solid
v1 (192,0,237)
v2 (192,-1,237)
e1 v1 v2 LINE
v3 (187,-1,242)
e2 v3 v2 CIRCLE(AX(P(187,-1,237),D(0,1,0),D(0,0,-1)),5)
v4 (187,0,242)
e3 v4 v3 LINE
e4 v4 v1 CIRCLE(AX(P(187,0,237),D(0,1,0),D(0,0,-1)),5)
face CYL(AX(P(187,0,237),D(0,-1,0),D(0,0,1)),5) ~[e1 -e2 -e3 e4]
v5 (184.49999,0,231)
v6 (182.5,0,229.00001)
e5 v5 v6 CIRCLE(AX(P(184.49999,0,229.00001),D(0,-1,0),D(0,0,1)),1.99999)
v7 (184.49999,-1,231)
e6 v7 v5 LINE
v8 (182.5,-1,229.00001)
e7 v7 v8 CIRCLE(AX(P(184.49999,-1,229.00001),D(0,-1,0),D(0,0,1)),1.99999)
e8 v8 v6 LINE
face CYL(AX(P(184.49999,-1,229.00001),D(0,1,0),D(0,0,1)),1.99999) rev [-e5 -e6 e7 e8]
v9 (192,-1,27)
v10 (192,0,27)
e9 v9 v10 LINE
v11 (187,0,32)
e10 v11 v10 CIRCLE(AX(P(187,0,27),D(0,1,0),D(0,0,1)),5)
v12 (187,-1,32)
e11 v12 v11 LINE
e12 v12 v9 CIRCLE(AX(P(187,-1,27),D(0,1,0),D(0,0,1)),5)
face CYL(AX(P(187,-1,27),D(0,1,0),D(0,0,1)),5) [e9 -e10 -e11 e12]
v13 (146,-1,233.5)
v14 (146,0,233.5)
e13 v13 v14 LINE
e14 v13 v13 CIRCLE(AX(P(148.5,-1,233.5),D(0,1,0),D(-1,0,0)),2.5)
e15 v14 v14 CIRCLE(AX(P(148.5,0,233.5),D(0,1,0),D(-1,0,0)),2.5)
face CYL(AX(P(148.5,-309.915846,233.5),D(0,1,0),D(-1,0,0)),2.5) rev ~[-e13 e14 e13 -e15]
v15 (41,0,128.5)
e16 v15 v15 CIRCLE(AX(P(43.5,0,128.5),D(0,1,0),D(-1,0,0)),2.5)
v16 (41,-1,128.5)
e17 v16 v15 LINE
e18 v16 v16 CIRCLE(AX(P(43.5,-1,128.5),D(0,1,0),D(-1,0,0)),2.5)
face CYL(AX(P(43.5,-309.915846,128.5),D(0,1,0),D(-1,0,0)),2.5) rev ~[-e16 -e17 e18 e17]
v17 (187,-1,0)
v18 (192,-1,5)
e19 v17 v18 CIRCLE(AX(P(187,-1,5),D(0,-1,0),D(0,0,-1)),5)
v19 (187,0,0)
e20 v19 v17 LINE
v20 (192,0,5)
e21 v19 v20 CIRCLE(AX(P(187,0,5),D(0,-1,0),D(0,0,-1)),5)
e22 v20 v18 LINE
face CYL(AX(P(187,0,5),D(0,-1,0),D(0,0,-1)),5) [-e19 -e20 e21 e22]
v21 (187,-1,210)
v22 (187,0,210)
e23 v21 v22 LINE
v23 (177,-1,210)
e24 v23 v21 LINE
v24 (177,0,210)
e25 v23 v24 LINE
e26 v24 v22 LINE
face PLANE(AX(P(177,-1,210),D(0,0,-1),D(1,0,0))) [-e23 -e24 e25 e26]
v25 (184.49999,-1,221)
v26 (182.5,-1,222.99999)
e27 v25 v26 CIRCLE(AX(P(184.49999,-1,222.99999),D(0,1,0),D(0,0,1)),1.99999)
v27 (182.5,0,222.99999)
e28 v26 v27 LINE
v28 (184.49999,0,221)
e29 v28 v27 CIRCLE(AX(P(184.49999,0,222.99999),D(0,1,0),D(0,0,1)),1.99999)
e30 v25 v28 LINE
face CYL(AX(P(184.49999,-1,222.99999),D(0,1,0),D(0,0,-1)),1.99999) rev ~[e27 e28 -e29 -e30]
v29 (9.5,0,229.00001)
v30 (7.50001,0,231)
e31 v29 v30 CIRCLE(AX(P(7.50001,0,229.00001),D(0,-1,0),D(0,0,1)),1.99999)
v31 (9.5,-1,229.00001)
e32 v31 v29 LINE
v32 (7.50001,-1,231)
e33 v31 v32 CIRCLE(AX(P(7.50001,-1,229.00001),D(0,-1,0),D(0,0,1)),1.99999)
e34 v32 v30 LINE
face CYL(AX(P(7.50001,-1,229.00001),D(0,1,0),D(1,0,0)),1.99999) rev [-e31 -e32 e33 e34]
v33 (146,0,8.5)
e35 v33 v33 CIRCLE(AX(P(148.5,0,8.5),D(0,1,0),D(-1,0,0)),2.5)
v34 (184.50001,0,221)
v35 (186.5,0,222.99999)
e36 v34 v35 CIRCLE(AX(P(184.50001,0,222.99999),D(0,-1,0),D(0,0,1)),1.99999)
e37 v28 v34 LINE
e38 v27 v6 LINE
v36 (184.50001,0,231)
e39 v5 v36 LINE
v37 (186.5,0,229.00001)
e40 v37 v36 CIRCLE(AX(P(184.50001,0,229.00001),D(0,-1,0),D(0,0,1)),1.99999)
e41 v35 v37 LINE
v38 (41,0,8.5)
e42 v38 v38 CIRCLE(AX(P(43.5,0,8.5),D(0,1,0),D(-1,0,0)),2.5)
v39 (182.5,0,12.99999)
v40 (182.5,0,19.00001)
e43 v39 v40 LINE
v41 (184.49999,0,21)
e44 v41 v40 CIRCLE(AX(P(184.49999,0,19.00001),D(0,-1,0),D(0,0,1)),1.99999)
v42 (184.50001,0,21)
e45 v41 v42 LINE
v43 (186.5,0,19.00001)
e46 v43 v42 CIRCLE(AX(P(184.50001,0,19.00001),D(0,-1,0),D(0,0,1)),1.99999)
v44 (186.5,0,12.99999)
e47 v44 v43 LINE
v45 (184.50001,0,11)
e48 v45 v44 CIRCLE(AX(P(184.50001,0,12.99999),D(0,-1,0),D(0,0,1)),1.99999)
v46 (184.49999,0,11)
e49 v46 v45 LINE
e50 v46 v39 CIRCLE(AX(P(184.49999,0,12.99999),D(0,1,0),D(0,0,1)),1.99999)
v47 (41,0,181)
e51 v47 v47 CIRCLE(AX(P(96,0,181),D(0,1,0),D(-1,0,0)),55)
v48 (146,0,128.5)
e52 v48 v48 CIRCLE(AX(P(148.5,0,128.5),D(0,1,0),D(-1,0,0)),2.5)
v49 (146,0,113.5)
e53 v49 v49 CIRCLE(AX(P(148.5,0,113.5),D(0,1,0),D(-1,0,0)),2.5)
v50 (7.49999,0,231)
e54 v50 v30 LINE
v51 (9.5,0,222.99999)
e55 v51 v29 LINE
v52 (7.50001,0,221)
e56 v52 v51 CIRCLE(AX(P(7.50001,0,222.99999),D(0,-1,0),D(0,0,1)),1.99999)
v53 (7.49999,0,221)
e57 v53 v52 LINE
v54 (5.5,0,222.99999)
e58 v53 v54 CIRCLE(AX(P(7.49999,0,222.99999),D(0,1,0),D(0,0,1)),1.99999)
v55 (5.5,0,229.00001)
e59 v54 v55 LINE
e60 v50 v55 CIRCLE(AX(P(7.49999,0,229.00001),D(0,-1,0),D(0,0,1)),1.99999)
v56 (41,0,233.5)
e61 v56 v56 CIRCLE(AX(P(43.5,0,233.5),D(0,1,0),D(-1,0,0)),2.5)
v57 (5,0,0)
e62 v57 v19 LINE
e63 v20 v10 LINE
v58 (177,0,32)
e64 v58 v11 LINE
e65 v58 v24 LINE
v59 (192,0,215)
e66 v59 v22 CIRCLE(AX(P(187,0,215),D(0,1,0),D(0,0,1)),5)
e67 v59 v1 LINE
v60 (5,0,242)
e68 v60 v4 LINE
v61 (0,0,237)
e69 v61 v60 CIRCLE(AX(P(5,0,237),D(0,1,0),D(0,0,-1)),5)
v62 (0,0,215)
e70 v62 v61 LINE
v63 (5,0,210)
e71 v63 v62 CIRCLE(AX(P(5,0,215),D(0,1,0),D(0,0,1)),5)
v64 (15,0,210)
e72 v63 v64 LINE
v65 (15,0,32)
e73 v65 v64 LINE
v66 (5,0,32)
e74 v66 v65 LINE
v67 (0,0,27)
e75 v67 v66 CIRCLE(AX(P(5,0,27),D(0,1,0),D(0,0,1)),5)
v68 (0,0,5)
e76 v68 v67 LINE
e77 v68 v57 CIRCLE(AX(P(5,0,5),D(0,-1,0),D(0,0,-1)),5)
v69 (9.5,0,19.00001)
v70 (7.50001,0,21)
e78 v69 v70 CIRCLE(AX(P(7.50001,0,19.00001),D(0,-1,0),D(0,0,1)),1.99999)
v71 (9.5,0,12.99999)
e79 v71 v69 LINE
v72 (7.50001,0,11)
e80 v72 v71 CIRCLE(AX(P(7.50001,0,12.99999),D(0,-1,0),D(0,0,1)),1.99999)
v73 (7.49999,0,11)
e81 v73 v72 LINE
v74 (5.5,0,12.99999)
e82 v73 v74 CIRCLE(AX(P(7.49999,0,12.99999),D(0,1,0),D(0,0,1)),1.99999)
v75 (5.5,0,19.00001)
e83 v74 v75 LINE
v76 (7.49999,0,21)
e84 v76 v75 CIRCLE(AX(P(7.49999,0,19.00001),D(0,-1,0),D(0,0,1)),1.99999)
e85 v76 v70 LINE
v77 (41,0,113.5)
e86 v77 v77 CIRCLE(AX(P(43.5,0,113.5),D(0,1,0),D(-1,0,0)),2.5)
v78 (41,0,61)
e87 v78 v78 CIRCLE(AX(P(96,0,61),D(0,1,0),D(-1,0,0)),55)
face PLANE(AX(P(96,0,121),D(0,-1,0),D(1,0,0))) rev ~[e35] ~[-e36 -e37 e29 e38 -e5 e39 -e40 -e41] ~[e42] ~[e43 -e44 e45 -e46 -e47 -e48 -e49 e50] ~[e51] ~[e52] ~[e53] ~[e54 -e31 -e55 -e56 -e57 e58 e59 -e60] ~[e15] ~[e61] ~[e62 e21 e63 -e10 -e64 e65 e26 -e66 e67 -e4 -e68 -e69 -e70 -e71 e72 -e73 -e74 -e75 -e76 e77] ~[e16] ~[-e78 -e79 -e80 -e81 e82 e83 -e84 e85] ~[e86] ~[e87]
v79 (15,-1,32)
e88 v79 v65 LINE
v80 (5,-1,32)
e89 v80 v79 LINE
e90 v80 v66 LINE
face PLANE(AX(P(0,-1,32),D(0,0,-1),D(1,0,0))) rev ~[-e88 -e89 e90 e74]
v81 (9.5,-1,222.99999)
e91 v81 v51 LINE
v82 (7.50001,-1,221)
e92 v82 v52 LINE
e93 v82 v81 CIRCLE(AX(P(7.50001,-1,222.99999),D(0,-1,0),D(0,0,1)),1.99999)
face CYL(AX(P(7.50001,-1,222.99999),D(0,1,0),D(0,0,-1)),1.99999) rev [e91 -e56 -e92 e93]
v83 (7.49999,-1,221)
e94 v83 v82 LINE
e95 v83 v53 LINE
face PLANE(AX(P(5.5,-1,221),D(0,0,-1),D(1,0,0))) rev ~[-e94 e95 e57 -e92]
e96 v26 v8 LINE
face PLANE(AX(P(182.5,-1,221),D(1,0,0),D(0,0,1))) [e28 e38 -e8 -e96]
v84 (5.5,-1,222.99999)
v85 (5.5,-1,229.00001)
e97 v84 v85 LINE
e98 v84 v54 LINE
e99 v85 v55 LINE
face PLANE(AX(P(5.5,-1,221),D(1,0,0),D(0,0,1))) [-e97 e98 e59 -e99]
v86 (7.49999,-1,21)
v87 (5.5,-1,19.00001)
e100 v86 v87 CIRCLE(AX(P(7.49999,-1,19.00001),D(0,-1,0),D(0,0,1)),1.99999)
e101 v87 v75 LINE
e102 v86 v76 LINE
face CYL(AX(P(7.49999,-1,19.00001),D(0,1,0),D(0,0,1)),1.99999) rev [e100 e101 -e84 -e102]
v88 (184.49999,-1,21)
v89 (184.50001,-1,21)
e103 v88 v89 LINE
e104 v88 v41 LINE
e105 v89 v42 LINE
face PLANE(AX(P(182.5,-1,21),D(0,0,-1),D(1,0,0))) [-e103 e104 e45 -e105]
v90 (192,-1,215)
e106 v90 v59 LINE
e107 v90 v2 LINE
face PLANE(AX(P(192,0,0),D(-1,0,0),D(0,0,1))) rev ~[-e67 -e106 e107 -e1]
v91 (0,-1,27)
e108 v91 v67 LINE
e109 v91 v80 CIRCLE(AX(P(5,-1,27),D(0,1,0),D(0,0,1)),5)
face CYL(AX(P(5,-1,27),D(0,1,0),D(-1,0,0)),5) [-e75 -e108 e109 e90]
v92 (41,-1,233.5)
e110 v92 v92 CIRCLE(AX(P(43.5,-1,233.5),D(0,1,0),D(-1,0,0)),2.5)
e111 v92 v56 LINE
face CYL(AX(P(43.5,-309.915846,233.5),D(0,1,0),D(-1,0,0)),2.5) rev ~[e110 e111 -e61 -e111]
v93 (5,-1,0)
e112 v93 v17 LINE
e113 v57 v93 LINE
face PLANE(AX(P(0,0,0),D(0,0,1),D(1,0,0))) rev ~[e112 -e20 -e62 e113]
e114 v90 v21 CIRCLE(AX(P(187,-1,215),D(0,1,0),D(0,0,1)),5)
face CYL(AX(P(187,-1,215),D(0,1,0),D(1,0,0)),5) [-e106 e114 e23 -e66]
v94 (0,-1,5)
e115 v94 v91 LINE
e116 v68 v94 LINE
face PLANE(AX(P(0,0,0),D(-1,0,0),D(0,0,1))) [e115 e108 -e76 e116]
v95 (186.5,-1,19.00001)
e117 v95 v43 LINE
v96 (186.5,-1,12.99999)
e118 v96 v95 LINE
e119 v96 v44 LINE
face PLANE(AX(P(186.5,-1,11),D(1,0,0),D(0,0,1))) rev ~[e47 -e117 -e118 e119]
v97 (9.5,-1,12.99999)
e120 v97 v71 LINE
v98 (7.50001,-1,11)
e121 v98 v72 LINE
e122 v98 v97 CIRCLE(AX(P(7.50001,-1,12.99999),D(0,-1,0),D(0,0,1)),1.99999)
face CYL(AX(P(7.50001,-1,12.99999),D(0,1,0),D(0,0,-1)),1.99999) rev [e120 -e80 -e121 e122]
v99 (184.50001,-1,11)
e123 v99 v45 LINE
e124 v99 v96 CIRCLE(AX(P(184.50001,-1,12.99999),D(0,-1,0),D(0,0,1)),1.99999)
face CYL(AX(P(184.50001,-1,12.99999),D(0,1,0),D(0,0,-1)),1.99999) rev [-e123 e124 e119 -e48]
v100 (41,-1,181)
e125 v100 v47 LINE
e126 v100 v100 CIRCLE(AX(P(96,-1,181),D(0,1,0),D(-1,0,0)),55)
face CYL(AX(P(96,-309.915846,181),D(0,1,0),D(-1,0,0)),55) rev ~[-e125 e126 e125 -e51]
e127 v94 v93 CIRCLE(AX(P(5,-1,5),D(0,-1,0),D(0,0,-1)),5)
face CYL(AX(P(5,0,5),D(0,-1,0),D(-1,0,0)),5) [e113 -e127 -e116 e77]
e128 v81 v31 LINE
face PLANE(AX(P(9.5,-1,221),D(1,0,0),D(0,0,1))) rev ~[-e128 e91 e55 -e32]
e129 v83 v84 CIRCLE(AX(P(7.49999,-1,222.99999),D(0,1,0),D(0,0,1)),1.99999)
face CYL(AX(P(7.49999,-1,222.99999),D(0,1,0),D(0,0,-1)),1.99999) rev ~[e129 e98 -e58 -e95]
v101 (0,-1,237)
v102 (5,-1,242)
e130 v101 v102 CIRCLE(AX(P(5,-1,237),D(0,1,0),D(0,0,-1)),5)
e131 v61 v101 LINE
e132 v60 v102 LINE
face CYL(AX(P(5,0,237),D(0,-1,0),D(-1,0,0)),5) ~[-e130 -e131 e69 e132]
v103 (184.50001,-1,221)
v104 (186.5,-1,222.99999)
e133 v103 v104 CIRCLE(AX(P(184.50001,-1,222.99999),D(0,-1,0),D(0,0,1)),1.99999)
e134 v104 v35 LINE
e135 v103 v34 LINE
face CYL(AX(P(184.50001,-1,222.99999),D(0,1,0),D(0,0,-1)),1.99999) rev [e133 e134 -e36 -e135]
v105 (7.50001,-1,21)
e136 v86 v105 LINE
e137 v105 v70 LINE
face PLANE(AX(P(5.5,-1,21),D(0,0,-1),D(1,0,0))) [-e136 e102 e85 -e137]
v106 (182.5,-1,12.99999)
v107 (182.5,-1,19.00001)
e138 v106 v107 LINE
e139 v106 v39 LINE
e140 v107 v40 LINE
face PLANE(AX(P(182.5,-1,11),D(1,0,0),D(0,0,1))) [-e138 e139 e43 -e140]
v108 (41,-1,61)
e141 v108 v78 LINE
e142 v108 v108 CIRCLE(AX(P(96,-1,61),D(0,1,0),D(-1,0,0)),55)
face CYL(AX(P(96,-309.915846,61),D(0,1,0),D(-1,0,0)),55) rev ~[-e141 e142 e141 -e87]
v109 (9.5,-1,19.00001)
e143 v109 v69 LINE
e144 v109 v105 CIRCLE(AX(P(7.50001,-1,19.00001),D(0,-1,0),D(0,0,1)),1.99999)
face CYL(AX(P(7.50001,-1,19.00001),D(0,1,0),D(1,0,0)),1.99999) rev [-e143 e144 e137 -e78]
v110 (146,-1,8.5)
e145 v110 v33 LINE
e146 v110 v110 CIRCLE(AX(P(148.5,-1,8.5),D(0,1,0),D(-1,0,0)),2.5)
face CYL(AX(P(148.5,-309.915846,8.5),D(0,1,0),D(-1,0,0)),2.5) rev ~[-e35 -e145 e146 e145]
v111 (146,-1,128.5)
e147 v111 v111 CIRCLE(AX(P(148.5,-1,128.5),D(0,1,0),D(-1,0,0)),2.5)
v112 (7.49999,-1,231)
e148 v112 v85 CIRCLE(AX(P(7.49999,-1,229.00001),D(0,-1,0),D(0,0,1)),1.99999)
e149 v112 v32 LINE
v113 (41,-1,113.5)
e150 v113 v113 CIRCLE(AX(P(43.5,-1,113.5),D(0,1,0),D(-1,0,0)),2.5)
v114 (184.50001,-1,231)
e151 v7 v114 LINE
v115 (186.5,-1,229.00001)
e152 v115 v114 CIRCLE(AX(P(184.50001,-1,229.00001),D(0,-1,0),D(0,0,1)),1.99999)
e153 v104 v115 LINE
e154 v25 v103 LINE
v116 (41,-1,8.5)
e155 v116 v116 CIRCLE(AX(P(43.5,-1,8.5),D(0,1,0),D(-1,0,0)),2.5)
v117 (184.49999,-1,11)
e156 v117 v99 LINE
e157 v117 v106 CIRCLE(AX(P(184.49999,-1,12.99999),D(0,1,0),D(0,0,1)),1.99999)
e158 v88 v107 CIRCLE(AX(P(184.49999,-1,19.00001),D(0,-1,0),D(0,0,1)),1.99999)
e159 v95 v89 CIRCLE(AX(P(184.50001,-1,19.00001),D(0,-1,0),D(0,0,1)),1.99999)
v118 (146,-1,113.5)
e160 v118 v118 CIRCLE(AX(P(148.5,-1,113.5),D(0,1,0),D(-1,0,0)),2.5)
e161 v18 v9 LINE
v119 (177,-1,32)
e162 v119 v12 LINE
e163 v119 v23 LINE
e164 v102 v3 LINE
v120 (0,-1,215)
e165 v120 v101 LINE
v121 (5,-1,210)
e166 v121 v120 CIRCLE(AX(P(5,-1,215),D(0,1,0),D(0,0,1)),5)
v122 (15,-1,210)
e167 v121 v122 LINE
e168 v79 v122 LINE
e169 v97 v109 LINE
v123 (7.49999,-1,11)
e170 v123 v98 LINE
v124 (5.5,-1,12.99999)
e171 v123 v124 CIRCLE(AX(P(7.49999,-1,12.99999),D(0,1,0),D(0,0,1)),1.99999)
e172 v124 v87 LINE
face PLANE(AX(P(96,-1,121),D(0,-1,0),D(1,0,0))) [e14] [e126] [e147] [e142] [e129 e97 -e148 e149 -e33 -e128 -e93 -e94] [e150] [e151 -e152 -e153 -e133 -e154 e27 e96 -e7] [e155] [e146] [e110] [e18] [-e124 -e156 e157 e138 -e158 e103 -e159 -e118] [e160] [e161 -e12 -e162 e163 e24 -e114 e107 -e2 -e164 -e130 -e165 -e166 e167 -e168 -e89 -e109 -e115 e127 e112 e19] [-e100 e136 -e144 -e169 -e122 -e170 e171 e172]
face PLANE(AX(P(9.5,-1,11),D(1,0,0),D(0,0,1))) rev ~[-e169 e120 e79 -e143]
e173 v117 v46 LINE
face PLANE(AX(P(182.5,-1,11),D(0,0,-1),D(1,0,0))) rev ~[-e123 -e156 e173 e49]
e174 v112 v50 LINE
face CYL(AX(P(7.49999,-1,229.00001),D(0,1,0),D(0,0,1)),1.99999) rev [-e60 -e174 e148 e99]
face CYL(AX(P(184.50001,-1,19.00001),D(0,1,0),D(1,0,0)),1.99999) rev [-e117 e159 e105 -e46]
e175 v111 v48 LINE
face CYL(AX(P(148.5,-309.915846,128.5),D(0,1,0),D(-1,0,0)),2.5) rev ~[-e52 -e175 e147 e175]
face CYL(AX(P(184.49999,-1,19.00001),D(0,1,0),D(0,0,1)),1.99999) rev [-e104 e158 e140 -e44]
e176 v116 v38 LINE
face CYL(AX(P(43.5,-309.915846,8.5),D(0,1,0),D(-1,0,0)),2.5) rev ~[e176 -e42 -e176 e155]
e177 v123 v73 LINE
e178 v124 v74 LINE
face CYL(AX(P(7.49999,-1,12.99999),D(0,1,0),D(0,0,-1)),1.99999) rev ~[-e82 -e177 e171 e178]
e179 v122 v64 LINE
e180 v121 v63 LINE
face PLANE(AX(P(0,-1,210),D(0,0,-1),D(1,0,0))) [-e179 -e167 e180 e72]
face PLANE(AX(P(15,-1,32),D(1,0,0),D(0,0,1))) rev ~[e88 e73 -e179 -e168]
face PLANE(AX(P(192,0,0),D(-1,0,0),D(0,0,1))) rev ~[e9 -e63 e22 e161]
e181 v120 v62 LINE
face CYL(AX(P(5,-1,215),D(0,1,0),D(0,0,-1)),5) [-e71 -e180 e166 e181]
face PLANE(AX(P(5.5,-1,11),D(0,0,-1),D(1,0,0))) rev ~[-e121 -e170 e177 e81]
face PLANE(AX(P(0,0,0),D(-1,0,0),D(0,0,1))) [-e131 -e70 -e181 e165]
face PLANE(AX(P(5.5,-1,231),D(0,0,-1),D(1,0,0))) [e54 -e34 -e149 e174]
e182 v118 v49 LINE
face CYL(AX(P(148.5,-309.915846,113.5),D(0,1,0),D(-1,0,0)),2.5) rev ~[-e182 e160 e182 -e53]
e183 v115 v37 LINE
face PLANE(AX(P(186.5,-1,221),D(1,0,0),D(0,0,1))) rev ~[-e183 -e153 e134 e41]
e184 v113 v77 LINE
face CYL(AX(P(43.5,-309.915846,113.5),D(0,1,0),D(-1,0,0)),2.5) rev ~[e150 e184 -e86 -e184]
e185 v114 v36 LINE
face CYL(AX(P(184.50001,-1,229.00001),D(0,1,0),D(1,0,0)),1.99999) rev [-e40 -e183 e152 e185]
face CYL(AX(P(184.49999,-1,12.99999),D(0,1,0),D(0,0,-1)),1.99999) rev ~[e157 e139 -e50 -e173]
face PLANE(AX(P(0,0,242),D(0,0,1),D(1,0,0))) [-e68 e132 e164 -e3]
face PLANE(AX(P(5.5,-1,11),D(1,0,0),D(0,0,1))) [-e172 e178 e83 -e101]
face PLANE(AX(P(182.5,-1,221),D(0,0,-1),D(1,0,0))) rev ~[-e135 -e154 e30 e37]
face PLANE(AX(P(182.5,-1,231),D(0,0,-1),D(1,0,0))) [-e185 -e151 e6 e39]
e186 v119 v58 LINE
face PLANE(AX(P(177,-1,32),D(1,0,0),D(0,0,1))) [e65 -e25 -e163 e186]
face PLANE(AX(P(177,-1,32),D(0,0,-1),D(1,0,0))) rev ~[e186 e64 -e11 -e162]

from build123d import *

# Parameters (mm, degrees)
F0_W      = 192
F0_H      = 242
F1_DEPTH  = 1
F3_D      = 110
F5_D      = 5
F6_W      = 15
F6_H      = 178
F7_DEPTH  = 1
F8_R      = 5
F9_W      = 4
F9_H      = 10
F10_DEPTH = 1
F11_R     = 1.99999


# Not quite as in the source:
# - a fillet or chamfer is up to 0.001 mm smaller than in the source, because OpenCascade refuses the exact size


with BuildPart() as f1:
    # F0 (on Front) → F1 (new body)
    with BuildSketch(Plane.XZ):
        with Locations((96, 121)):
            Rectangle(F0_W, F0_H)
    extrude(amount=F1_DEPTH)

    # F3 (through all)
    with Locations(Plane.XZ.offset(1)):
        with Locations((96, 181), (96, 61)):
            Hole(F3_D / 2)

    # F5 (through all)
    with Locations(Plane.XZ.offset(1)):
        with Locations((43.5, 233.5), (148.5, 233.5), (43.5, 128.5), (148.5, 128.5), (43.5, 113.5), (148.5, 113.5), (43.5, 8.5), (148.5, 8.5)):
            Hole(F5_D / 2)

    # F6 (on face) → F7 (cut)
    with BuildSketch(Plane.XZ.offset(1)):
        with Locations((7.5, 121)):
            Rectangle(F6_W, F6_H)
        with Locations((184.5, 121)):
            Rectangle(F6_W, F6_H)
    extrude(amount=-F7_DEPTH, mode=Mode.SUBTRACT)

    # F8
    f8_edges = [f1.edges().sort_by_distance(p)[0] for p in [
        (0, -0.5, 210),
        (0, -0.5, 242),
        (0, -0.5, 32),
        (0, -0.5, 0),
        (192, -0.5, 32),
        (192, -0.5, 0),
        (192, -0.5, 242),
        (192, -0.5, 210),
    ]]
    fillet(f8_edges, radius=F8_R)

    # F9 (on face) → F10 (cut)
    with BuildSketch(Plane.XZ.offset(1)):
        with Locations((7.5, 226)):
            Rectangle(F9_W, F9_H)
        with Locations((184.5, 226)):
            Rectangle(F9_W, F9_H)
        with Locations((7.5, 16)):
            Rectangle(F9_W, F9_H)
        with Locations((184.5, 16)):
            Rectangle(F9_W, F9_H)
    extrude(amount=-F10_DEPTH, mode=Mode.SUBTRACT)

    # F11 (radius 2 in the source; OpenCascade refuses exactly that, so slightly less here)
    f11_edges = [f1.edges().sort_by_distance(p)[0] for p in [
        (9.5, -0.5, 231),
        (5.5, -0.5, 231),
        (5.5, -0.5, 221),
        (9.5, -0.5, 221),
        (182.5, -0.5, 231),
        (186.5, -0.5, 231),
        (182.5, -0.5, 221),
        (186.5, -0.5, 221),
        (182.5, -0.5, 21),
        (186.5, -0.5, 21),
        (186.5, -0.5, 11),
        (182.5, -0.5, 11),
        (5.5, -0.5, 21),
        (9.5, -0.5, 21),
        (9.5, -0.5, 11),
        (5.5, -0.5, 11),
    ]]
    fillet(f11_edges, radius=F11_R)


solid = f1.part
